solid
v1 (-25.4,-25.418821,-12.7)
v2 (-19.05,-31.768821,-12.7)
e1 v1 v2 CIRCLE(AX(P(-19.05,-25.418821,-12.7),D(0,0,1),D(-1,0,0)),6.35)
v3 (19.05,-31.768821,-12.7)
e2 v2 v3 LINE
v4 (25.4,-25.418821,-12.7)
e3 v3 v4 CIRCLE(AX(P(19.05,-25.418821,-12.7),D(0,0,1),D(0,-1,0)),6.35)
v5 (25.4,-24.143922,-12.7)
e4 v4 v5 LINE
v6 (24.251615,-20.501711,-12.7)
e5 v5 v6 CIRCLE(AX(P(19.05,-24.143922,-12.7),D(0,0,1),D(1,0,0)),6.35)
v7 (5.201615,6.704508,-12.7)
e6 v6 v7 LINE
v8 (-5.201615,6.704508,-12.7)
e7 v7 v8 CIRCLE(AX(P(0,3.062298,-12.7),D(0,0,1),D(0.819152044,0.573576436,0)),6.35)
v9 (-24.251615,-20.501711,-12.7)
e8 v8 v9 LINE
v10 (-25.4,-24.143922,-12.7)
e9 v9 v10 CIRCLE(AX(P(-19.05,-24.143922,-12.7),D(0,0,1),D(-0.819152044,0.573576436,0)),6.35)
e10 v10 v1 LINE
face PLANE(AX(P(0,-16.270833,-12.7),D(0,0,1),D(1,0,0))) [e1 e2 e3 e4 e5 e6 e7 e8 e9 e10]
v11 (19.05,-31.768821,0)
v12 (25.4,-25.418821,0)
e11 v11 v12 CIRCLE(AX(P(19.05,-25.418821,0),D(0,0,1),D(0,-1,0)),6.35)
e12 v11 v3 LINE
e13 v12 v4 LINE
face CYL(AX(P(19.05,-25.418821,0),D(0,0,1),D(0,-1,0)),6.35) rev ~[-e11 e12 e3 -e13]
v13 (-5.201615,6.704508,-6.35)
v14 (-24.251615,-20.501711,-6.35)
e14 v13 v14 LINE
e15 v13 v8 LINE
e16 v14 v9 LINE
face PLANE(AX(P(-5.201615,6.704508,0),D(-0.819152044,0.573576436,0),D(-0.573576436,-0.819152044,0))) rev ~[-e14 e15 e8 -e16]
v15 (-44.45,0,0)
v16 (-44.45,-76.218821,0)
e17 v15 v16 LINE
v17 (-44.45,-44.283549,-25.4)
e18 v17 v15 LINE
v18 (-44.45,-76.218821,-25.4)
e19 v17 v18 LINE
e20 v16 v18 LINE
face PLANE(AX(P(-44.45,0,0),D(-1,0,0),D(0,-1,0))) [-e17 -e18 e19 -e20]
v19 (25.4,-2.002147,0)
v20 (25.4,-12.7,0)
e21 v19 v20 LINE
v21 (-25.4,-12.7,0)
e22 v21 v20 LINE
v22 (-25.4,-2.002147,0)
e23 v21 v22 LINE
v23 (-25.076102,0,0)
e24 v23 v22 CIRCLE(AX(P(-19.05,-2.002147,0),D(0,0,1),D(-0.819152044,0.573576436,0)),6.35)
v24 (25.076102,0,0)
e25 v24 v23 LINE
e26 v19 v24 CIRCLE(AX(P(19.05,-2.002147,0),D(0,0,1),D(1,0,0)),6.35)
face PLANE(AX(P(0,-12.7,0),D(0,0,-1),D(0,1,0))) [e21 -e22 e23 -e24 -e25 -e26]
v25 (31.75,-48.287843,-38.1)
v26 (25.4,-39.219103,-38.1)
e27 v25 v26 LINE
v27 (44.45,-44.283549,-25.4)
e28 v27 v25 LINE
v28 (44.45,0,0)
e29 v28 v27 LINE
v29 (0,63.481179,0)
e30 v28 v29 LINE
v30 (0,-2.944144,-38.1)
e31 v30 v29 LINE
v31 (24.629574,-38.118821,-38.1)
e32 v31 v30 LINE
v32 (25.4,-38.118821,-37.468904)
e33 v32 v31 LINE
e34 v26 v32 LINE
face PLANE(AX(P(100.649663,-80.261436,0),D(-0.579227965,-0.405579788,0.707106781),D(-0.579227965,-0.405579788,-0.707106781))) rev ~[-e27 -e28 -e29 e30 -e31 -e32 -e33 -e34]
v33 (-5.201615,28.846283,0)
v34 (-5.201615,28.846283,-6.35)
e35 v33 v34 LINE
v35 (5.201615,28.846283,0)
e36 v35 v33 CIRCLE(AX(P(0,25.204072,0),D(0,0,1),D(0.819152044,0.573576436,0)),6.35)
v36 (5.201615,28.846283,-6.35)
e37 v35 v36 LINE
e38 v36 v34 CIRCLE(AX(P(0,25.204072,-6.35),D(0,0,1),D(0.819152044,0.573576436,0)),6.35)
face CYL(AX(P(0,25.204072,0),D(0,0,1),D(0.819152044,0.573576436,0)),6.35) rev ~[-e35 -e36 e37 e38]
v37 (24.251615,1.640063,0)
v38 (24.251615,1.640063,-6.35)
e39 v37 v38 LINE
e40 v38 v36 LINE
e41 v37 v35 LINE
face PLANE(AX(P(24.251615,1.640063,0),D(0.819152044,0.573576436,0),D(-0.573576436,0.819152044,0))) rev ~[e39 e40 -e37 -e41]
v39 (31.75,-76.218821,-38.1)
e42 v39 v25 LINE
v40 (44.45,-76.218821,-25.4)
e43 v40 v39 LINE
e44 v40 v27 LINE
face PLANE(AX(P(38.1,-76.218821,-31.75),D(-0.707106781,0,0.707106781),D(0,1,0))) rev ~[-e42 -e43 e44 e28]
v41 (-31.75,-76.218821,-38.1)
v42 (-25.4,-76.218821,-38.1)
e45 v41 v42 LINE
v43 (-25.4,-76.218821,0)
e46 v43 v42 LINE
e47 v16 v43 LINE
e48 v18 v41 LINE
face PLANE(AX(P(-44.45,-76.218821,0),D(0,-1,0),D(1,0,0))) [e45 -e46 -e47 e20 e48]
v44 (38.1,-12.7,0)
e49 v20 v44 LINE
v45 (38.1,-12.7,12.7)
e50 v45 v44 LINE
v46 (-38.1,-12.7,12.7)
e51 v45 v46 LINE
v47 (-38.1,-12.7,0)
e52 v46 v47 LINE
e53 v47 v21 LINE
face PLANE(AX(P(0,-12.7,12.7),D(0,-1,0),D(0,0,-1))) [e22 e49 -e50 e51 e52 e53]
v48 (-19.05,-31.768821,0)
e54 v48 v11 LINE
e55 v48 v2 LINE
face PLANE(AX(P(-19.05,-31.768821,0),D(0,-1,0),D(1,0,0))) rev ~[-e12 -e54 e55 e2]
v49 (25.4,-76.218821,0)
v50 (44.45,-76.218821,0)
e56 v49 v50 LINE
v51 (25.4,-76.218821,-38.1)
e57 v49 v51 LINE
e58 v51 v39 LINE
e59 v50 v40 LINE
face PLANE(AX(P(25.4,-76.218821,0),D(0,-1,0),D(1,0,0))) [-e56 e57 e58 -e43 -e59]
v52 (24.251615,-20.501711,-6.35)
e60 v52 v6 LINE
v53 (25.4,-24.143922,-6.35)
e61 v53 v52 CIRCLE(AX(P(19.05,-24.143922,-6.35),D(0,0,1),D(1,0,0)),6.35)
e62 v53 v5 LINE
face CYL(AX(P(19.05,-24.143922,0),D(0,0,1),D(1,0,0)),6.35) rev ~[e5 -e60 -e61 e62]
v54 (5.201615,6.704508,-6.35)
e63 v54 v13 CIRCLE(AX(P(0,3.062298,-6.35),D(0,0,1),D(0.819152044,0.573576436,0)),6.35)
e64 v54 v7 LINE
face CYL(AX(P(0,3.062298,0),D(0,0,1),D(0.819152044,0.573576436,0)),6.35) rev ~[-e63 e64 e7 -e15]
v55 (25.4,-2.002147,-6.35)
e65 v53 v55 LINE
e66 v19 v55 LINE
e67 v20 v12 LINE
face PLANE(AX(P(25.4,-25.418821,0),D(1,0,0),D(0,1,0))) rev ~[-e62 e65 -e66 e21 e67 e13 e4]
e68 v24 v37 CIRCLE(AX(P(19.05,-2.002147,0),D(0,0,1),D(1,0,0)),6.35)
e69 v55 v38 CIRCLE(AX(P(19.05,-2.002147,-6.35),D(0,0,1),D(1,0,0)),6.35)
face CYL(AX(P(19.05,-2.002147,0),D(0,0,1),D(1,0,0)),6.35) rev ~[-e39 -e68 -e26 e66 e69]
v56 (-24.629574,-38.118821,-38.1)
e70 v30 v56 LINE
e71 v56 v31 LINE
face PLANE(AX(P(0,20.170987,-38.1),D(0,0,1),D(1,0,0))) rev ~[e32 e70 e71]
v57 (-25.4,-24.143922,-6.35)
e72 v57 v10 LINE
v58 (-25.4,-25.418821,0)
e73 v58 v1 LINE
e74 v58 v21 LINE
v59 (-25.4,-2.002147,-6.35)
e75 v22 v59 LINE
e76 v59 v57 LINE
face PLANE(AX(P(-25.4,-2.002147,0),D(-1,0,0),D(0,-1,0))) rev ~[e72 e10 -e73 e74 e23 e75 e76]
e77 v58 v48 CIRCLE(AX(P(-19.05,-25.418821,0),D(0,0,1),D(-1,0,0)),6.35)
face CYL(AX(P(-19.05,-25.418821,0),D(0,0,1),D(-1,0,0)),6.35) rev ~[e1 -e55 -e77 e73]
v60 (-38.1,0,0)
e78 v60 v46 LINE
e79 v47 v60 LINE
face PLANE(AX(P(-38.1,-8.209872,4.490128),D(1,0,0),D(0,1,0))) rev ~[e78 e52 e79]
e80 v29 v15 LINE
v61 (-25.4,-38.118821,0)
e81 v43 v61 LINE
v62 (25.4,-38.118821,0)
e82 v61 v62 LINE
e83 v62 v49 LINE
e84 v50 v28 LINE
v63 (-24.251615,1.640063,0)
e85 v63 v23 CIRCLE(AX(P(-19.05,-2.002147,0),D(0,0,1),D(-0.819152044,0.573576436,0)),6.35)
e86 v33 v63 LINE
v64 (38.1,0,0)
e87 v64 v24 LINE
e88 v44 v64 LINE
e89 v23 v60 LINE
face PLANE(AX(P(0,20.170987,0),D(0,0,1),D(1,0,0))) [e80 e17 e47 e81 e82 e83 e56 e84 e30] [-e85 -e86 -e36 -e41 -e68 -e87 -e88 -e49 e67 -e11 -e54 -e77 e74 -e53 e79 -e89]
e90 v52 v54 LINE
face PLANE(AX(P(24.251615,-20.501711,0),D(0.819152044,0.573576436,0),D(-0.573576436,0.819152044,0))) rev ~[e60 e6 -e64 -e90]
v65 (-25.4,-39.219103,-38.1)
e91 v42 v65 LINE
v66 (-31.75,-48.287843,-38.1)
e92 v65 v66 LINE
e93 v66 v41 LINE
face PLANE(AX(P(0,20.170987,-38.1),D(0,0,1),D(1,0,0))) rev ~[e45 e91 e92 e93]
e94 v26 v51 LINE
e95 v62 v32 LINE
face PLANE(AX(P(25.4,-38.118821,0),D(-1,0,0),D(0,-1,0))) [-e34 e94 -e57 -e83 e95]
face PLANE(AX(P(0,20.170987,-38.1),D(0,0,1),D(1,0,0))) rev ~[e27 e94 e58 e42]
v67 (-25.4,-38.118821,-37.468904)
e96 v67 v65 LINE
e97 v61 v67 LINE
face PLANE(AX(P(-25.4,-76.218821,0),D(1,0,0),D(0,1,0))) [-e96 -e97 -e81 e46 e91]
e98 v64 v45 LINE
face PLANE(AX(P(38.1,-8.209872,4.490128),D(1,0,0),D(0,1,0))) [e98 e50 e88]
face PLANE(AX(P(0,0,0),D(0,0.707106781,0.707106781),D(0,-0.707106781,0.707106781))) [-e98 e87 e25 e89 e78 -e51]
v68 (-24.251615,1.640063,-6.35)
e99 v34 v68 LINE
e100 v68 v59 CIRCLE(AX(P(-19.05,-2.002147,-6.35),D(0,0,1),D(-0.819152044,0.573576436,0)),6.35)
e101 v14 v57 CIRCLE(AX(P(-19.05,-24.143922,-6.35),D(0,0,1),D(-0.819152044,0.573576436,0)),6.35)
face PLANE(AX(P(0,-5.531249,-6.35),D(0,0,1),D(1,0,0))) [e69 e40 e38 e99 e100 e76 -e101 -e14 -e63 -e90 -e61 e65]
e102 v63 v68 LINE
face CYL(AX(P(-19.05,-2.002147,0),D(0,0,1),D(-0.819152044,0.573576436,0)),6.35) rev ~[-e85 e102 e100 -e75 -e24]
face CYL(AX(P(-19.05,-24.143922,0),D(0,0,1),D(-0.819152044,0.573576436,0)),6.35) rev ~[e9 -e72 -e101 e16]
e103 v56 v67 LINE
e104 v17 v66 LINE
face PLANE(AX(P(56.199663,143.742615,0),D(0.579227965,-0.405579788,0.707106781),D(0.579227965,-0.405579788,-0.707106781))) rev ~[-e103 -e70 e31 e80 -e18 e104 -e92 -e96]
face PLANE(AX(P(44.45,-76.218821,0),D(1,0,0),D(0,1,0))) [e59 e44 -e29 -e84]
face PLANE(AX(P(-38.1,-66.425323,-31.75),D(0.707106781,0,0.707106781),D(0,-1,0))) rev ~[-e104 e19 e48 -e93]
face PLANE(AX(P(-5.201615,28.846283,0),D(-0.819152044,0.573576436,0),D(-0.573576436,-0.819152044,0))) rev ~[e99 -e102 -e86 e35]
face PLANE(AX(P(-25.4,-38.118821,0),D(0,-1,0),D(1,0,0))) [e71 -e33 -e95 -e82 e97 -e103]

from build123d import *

# Parameters (mm, degrees)
F1_DEPTH    = 38.1
F2_T1_DEPTH = 273.4584537484
F2_T3_DEPTH = 273.4584537484
F3_SIZE     = 12.7
F5_DEPTH    = 6.35
F8_DEPTH    = 12.7
F9_DEPTH    = 38.1


# Not quite as in the source:
# - a fillet or chamfer that OpenCascade refuses, or shapes differently, is made with other operations: its cross-section is extruded or revolved along the edge and cut away or added


with BuildPart() as f1:
    # F0 (on Top) → F1 (new body)
    with BuildSketch(Plane.XY):
        Polygon((0, 63.4811788997), (-44.45, 0), (44.45, 0), align=None)
        Polygon((44.45, 0), (-44.45, 0), (-44.45, -76.2188211003), (-25.4, -76.2188211003), (-25.4, -38.1188211003), (25.4, -38.1188211003), (25.4, -76.2188211003), (44.45, -76.2188211003), align=None)
    extrude(amount=-F1_DEPTH)

    # F2: chamfer of 38.1 on 2 edges, made by hand

    # F2_s2 → F2_t1 (cut)
    with BuildSketch(Plane(origin=(70.8232650101, -101.1461047552, 0), x_dir=(0, 0, 1), z_dir=(-0.5735764364, 0.8191520443, 0))):
        Polygon((0, 36.4113083686), (-38.1, -1.6886916314), (-38.1, 36.4113083686), align=None)
    extrude(amount=F2_T1_DEPTH, mode=Mode.SUBTRACT)

    # F2_s4 → F2_t3 (cut)
    with BuildSketch(Plane(origin=(86.0260603809, 122.8579466609, 0), x_dir=(0, 0, 1), z_dir=(-0.5735764364, -0.8191520443, 0))):
        Polygon((0, 36.4113083686), (-38.1, -1.6886916314), (-38.1, 36.4113083686), align=None)
    extrude(amount=F2_T3_DEPTH, mode=Mode.SUBTRACT)

    # F3
    f3_edges = [f1.edges().sort_by_distance(p)[0] for p in [
        (44.45, -71.322072, -38.1),
        (-44.45, -71.322072, -38.1),
    ]]
    chamfer(f3_edges, length=F3_SIZE)

    # F4 (on Top) → F5 (cut)
    with BuildSketch(Plane.XY):
        with BuildLine():
            ThreePointArc((5.2016154812, 28.8462825899), (0, 31.5540722191), (-5.2016154812, 28.8462825899))
            Line((-5.2016154812, 28.8462825899), (-24.2516154812, 1.6400630614))
            ThreePointArc((-24.2516154812, 1.6400630614), (-25.1061026373, -0.0926654825), (-25.4, -2.0021473094))
            Line((-25.4, -2.0021473094), (-25.4, -25.4188211003))
            ThreePointArc((-25.4, -25.4188211003), (-23.5401280605, -29.9089491608), (-19.05, -31.7688211003))
            Line((-19.05, -31.7688211003), (0, -31.7688211003))
            Line((0, -31.7688211003), (19.05, -31.7688211003))
            ThreePointArc((19.05, -31.7688211003), (23.5401280605, -29.9089491608), (25.4, -25.4188211003))
            Line((25.4, -25.4188211003), (25.4, -2.0021473094))
            ThreePointArc((25.4, -2.0021473094), (25.1061026373, -0.0926654825), (24.2516154812, 1.6400630614))
            Line((24.2516154812, 1.6400630614), (5.2016154812, 28.8462825899))
        make_face()
    extrude(amount=-F5_DEPTH, mode=Mode.SUBTRACT)

    # F7 (on Top) → F8 (cut)
    with BuildSketch(Plane.XY):
        with BuildLine():
            Line((-19.05, -31.7688211003), (0, -31.7688211003))
            Line((0, -31.7688211003), (19.05, -31.7688211003))
            ThreePointArc((19.05, -31.7688211003), (23.5401280605, -29.9089491608), (25.4, -25.4188211003))
            Line((25.4, -25.4188211003), (25.4, -24.1439216138))
            ThreePointArc((25.4, -24.1439216138), (25.1061026373, -22.2344397869), (24.2516154812, -20.5017112429))
            Line((24.2516154812, -20.5017112429), (5.2016154812, 6.7045082855))
            ThreePointArc((5.2016154812, 6.7045082855), (0, 9.4122979147), (-5.2016154812, 6.7045082855))
            Line((-5.2016154812, 6.7045082855), (-24.2516154812, -20.5017112429))
            ThreePointArc((-24.2516154812, -20.5017112429), (-25.1061026373, -22.2344397869), (-25.4, -24.1439216138))
            Line((-25.4, -24.1439216138), (-25.4, -25.4188211003))
            ThreePointArc((-25.4, -25.4188211003), (-23.5401280605, -29.9089491608), (-19.05, -31.7688211003))
        make_face()
    extrude(amount=-F8_DEPTH, mode=Mode.SUBTRACT)

    # F6 (on Right) → F9 (join, symmetric)
    with BuildSketch(Plane.YZ):
        Polygon((-12.7, 12.7), (-12.7, 0), (0, 0), align=None)
    extrude(amount=F9_DEPTH, both=True)


solid = f1.part
